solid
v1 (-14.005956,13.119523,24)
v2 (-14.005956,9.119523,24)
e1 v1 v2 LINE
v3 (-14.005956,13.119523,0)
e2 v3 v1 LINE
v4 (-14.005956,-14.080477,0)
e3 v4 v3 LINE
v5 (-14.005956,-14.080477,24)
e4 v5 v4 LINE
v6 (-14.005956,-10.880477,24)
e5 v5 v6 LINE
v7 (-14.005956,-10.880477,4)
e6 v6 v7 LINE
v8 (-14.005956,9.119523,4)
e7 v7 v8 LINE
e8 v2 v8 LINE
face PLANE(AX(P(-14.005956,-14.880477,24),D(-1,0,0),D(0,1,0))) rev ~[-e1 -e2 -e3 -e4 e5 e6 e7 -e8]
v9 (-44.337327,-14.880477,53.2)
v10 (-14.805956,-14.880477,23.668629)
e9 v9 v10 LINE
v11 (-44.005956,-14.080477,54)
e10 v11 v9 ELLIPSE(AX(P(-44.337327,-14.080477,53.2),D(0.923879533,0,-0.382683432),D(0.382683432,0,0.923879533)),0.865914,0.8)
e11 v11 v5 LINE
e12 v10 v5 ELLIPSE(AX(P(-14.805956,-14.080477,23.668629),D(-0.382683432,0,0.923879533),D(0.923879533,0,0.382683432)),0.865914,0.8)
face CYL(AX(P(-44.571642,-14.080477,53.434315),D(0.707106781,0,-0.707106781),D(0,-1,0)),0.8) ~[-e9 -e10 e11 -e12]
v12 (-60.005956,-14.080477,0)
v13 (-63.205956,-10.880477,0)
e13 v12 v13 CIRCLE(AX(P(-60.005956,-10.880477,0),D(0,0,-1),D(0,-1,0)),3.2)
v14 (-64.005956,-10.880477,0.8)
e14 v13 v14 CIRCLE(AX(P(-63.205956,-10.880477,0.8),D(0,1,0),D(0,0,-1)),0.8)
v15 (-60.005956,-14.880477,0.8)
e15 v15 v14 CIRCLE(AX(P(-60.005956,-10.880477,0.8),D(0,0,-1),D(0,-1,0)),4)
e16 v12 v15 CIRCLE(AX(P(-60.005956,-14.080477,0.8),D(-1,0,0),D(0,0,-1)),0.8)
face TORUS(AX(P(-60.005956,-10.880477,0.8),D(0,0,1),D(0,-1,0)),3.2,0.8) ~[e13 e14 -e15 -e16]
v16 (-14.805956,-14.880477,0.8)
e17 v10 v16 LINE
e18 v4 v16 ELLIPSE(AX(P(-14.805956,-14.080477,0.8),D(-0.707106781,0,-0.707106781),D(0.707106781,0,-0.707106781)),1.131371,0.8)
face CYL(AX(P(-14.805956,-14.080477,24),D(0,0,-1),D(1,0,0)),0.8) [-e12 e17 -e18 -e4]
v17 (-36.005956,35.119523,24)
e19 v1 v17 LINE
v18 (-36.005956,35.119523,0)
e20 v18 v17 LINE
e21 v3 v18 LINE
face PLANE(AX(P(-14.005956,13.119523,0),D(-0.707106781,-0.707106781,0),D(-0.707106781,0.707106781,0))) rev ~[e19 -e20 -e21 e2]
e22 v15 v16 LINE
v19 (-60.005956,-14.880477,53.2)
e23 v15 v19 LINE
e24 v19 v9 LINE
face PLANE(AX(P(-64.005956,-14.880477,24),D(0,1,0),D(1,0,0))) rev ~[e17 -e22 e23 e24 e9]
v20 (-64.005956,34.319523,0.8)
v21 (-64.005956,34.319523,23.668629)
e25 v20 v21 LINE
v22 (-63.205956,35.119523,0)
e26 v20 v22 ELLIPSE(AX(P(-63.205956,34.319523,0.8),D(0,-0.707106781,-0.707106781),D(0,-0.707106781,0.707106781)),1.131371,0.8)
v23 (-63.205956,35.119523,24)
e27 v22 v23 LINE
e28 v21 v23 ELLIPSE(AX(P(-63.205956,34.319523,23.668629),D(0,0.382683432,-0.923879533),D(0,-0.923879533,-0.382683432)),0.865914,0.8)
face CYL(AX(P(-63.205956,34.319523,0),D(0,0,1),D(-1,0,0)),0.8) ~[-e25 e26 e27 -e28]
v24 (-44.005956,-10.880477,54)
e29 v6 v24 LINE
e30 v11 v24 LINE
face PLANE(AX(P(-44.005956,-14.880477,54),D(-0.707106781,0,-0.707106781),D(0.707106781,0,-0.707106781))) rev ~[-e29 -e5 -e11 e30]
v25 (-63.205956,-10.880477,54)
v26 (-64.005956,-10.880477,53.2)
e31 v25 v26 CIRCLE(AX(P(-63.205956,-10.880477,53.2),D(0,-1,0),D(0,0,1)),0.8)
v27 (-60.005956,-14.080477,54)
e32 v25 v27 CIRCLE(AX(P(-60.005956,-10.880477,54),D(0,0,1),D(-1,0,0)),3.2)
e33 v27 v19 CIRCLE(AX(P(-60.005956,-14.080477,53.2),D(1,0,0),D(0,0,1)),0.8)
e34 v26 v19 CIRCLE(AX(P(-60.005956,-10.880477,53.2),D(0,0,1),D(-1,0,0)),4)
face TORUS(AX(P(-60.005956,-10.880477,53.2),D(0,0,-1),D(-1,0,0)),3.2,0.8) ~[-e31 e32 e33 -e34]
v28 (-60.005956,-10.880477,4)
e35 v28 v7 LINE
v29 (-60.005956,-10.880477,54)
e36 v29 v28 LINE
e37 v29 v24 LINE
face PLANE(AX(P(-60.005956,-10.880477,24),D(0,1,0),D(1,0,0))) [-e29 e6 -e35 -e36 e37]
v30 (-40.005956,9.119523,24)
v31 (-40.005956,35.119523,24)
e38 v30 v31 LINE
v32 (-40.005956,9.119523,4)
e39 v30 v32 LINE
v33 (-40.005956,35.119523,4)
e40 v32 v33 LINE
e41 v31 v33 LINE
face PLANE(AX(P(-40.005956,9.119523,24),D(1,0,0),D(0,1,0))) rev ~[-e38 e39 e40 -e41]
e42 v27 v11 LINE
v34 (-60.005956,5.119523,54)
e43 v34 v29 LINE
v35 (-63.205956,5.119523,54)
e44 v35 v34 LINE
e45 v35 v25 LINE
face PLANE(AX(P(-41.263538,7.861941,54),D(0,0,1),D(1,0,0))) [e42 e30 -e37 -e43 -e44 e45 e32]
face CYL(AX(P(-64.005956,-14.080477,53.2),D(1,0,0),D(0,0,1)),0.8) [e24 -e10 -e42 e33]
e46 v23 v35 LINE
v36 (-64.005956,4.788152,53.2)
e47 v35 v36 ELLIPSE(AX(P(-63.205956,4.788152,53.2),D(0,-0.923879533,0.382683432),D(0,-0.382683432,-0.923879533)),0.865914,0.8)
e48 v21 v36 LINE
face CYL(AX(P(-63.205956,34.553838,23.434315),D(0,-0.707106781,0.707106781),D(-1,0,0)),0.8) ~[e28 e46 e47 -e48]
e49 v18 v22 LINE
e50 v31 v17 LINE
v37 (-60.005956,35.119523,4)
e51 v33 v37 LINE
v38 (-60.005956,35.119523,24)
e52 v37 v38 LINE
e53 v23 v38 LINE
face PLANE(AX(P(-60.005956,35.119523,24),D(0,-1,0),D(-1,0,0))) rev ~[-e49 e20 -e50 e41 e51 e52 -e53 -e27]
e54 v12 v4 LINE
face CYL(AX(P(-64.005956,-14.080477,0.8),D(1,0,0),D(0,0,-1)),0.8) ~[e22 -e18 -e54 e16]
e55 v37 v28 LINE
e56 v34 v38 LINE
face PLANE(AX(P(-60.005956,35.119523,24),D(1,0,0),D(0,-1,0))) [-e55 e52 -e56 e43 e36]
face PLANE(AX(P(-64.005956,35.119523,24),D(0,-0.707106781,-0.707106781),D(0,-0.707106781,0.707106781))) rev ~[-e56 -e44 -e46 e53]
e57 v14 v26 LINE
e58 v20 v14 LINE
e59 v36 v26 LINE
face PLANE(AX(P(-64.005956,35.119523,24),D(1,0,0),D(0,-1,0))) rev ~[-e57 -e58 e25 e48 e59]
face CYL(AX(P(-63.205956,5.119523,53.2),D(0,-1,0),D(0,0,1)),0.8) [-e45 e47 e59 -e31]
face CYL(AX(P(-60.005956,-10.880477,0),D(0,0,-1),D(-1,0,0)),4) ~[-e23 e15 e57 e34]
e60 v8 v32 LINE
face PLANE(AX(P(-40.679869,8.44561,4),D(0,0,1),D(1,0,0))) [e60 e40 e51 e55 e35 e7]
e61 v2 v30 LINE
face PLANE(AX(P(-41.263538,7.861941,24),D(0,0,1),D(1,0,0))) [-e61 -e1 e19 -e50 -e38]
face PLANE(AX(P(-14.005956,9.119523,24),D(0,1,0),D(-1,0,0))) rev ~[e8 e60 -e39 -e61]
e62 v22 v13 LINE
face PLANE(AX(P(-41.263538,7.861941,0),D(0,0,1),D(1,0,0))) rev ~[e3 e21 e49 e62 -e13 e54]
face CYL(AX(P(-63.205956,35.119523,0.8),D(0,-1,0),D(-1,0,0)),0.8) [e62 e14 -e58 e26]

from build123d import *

# Parameters (mm, degrees)
F1_DEPTH     = 24
F3_DEPTH     = 20
F4_DEPTH     = 30
F6_DEPTH     = 25
F8_DEPTH     = 25
F9_R         = 0.8
F10_T1_DEPTH = 54
F10_T4_ANGLE = 90
F10_T6_ANGLE = 90


# Not quite as in the source:
# - a fillet or chamfer that OpenCascade refuses, or shapes differently, is made with other operations: its cross-section is extruded or revolved along the edge and cut away or added


with BuildPart() as f1:
    # F0 (on Top) → F1 (new body)
    with BuildSketch(Plane.XY):
        Polygon((-36.005956176, 35.1195232451), (-64.005956176, 35.1195232451), (-64.005956176, -14.8804767549), (-14.005956176, -14.8804767549), (-14.005956176, 13.1195232451), align=None)
    extrude(amount=F1_DEPTH)

    # F2 (on face) → F3 (cut)
    with BuildSketch(Plane.XY.offset(24)):
        Polygon((-40.005956176, 35.1195232451), (-60.005956176, 35.1195232451), (-60.005956176, -10.8804767549), (-14.005956176, -10.8804767549), (-14.005956176, 9.1195232451), (-40.005956176, 9.1195232451), align=None)
    extrude(amount=-F3_DEPTH, mode=Mode.SUBTRACT)

    # F4 (add): a face of the model
    f4_faces = [f1.faces().sort_by_distance(p)[0] for p in [
        (-60.7130629571, 12.1195232451, 24),
    ]]
    extrude(f4_faces, amount=F4_DEPTH)

    # F5 (on face) → F6 (cut)
    with BuildSketch(Plane.XZ.offset(14.8804767549)):
        Polygon((-14.005956176, 24), (-14.005956176, 54), (-44.005956176, 54), align=None)
    extrude(amount=-F6_DEPTH, mode=Mode.SUBTRACT)

    # F7 (on face) → F8 (cut)
    with BuildSketch(Plane(origin=(-64.005956176, 0, 0), x_dir=(0, -1, 0), z_dir=(-1, 0, 0))):
        Polygon((-5.1195232451, 54), (-35.1195232451, 54), (-35.1195232451, 24), align=None)
    extrude(amount=-F8_DEPTH, mode=Mode.SUBTRACT)

    # F9
    f9_edges = [f1.edges().sort_by_distance(p)[0] for p in [
        (-64.005956, -4.880477, 54),
        (-54.005956, -14.880477, 54),
        (-64.005956, 20.119523, 39),
        (-29.005956, -14.880477, 39),
        (-64.005956, 35.119523, 12),
        (-14.005956, -14.880477, 12),
        (-64.005956, 10.119523, 0),
        (-39.005956, -14.880477, 0),
    ]]
    fillet(f9_edges, radius=F9_R)

    # F10: fillet of radius 4 on 1 edges, made by hand

    # F10_s2 → F10_t1 (cut)
    with BuildSketch(Plane.XY):
        with BuildLine():
            ThreePointArc((-64.005956176, -10.8804767549), (-62.8343833007, -13.7089038797), (-60.005956176, -14.8804767549))
            Line((-60.005956176, -14.8804767549), (-64.005956176, -14.8804767549))
            Line((-64.005956176, -14.8804767549), (-64.005956176, -10.8804767549))
        make_face()
    extrude(amount=F10_T1_DEPTH, mode=Mode.SUBTRACT)

    # F10_s3 → F10_t4 (revolve, cut)
    with BuildSketch(Plane.YZ.offset(-60.005956176)):
        with BuildLine():
            ThreePointArc((-14.0804767549, 0), (-14.6461621799, 0.2343145751), (-14.8804767549, 0.8))
            Line((-14.8804767549, 0.8), (-14.8804767549, 0))
            Line((-14.8804767549, 0), (-14.0804767549, 0))
        make_face()
    revolve(axis=Axis((-60.005956176, -10.8804767549, 0), (0, 0, -1)), revolution_arc=F10_T4_ANGLE, mode=Mode.SUBTRACT)

    # F10_s5 → F10_t6 (revolve, cut)
    with BuildSketch(Plane.XZ.offset(10.8804767549)):
        with BuildLine():
            ThreePointArc((-63.205956176, 54), (-63.7716416009, 53.7656854249), (-64.005956176, 53.2))
            Line((-64.005956176, 53.2), (-64.005956176, 54))
            Line((-64.005956176, 54), (-63.205956176, 54))
        make_face()
    revolve(axis=Axis((-60.005956176, -10.8804767549, 54), (0, 0, 1)), revolution_arc=F10_T6_ANGLE, mode=Mode.SUBTRACT)


solid = f1.part
